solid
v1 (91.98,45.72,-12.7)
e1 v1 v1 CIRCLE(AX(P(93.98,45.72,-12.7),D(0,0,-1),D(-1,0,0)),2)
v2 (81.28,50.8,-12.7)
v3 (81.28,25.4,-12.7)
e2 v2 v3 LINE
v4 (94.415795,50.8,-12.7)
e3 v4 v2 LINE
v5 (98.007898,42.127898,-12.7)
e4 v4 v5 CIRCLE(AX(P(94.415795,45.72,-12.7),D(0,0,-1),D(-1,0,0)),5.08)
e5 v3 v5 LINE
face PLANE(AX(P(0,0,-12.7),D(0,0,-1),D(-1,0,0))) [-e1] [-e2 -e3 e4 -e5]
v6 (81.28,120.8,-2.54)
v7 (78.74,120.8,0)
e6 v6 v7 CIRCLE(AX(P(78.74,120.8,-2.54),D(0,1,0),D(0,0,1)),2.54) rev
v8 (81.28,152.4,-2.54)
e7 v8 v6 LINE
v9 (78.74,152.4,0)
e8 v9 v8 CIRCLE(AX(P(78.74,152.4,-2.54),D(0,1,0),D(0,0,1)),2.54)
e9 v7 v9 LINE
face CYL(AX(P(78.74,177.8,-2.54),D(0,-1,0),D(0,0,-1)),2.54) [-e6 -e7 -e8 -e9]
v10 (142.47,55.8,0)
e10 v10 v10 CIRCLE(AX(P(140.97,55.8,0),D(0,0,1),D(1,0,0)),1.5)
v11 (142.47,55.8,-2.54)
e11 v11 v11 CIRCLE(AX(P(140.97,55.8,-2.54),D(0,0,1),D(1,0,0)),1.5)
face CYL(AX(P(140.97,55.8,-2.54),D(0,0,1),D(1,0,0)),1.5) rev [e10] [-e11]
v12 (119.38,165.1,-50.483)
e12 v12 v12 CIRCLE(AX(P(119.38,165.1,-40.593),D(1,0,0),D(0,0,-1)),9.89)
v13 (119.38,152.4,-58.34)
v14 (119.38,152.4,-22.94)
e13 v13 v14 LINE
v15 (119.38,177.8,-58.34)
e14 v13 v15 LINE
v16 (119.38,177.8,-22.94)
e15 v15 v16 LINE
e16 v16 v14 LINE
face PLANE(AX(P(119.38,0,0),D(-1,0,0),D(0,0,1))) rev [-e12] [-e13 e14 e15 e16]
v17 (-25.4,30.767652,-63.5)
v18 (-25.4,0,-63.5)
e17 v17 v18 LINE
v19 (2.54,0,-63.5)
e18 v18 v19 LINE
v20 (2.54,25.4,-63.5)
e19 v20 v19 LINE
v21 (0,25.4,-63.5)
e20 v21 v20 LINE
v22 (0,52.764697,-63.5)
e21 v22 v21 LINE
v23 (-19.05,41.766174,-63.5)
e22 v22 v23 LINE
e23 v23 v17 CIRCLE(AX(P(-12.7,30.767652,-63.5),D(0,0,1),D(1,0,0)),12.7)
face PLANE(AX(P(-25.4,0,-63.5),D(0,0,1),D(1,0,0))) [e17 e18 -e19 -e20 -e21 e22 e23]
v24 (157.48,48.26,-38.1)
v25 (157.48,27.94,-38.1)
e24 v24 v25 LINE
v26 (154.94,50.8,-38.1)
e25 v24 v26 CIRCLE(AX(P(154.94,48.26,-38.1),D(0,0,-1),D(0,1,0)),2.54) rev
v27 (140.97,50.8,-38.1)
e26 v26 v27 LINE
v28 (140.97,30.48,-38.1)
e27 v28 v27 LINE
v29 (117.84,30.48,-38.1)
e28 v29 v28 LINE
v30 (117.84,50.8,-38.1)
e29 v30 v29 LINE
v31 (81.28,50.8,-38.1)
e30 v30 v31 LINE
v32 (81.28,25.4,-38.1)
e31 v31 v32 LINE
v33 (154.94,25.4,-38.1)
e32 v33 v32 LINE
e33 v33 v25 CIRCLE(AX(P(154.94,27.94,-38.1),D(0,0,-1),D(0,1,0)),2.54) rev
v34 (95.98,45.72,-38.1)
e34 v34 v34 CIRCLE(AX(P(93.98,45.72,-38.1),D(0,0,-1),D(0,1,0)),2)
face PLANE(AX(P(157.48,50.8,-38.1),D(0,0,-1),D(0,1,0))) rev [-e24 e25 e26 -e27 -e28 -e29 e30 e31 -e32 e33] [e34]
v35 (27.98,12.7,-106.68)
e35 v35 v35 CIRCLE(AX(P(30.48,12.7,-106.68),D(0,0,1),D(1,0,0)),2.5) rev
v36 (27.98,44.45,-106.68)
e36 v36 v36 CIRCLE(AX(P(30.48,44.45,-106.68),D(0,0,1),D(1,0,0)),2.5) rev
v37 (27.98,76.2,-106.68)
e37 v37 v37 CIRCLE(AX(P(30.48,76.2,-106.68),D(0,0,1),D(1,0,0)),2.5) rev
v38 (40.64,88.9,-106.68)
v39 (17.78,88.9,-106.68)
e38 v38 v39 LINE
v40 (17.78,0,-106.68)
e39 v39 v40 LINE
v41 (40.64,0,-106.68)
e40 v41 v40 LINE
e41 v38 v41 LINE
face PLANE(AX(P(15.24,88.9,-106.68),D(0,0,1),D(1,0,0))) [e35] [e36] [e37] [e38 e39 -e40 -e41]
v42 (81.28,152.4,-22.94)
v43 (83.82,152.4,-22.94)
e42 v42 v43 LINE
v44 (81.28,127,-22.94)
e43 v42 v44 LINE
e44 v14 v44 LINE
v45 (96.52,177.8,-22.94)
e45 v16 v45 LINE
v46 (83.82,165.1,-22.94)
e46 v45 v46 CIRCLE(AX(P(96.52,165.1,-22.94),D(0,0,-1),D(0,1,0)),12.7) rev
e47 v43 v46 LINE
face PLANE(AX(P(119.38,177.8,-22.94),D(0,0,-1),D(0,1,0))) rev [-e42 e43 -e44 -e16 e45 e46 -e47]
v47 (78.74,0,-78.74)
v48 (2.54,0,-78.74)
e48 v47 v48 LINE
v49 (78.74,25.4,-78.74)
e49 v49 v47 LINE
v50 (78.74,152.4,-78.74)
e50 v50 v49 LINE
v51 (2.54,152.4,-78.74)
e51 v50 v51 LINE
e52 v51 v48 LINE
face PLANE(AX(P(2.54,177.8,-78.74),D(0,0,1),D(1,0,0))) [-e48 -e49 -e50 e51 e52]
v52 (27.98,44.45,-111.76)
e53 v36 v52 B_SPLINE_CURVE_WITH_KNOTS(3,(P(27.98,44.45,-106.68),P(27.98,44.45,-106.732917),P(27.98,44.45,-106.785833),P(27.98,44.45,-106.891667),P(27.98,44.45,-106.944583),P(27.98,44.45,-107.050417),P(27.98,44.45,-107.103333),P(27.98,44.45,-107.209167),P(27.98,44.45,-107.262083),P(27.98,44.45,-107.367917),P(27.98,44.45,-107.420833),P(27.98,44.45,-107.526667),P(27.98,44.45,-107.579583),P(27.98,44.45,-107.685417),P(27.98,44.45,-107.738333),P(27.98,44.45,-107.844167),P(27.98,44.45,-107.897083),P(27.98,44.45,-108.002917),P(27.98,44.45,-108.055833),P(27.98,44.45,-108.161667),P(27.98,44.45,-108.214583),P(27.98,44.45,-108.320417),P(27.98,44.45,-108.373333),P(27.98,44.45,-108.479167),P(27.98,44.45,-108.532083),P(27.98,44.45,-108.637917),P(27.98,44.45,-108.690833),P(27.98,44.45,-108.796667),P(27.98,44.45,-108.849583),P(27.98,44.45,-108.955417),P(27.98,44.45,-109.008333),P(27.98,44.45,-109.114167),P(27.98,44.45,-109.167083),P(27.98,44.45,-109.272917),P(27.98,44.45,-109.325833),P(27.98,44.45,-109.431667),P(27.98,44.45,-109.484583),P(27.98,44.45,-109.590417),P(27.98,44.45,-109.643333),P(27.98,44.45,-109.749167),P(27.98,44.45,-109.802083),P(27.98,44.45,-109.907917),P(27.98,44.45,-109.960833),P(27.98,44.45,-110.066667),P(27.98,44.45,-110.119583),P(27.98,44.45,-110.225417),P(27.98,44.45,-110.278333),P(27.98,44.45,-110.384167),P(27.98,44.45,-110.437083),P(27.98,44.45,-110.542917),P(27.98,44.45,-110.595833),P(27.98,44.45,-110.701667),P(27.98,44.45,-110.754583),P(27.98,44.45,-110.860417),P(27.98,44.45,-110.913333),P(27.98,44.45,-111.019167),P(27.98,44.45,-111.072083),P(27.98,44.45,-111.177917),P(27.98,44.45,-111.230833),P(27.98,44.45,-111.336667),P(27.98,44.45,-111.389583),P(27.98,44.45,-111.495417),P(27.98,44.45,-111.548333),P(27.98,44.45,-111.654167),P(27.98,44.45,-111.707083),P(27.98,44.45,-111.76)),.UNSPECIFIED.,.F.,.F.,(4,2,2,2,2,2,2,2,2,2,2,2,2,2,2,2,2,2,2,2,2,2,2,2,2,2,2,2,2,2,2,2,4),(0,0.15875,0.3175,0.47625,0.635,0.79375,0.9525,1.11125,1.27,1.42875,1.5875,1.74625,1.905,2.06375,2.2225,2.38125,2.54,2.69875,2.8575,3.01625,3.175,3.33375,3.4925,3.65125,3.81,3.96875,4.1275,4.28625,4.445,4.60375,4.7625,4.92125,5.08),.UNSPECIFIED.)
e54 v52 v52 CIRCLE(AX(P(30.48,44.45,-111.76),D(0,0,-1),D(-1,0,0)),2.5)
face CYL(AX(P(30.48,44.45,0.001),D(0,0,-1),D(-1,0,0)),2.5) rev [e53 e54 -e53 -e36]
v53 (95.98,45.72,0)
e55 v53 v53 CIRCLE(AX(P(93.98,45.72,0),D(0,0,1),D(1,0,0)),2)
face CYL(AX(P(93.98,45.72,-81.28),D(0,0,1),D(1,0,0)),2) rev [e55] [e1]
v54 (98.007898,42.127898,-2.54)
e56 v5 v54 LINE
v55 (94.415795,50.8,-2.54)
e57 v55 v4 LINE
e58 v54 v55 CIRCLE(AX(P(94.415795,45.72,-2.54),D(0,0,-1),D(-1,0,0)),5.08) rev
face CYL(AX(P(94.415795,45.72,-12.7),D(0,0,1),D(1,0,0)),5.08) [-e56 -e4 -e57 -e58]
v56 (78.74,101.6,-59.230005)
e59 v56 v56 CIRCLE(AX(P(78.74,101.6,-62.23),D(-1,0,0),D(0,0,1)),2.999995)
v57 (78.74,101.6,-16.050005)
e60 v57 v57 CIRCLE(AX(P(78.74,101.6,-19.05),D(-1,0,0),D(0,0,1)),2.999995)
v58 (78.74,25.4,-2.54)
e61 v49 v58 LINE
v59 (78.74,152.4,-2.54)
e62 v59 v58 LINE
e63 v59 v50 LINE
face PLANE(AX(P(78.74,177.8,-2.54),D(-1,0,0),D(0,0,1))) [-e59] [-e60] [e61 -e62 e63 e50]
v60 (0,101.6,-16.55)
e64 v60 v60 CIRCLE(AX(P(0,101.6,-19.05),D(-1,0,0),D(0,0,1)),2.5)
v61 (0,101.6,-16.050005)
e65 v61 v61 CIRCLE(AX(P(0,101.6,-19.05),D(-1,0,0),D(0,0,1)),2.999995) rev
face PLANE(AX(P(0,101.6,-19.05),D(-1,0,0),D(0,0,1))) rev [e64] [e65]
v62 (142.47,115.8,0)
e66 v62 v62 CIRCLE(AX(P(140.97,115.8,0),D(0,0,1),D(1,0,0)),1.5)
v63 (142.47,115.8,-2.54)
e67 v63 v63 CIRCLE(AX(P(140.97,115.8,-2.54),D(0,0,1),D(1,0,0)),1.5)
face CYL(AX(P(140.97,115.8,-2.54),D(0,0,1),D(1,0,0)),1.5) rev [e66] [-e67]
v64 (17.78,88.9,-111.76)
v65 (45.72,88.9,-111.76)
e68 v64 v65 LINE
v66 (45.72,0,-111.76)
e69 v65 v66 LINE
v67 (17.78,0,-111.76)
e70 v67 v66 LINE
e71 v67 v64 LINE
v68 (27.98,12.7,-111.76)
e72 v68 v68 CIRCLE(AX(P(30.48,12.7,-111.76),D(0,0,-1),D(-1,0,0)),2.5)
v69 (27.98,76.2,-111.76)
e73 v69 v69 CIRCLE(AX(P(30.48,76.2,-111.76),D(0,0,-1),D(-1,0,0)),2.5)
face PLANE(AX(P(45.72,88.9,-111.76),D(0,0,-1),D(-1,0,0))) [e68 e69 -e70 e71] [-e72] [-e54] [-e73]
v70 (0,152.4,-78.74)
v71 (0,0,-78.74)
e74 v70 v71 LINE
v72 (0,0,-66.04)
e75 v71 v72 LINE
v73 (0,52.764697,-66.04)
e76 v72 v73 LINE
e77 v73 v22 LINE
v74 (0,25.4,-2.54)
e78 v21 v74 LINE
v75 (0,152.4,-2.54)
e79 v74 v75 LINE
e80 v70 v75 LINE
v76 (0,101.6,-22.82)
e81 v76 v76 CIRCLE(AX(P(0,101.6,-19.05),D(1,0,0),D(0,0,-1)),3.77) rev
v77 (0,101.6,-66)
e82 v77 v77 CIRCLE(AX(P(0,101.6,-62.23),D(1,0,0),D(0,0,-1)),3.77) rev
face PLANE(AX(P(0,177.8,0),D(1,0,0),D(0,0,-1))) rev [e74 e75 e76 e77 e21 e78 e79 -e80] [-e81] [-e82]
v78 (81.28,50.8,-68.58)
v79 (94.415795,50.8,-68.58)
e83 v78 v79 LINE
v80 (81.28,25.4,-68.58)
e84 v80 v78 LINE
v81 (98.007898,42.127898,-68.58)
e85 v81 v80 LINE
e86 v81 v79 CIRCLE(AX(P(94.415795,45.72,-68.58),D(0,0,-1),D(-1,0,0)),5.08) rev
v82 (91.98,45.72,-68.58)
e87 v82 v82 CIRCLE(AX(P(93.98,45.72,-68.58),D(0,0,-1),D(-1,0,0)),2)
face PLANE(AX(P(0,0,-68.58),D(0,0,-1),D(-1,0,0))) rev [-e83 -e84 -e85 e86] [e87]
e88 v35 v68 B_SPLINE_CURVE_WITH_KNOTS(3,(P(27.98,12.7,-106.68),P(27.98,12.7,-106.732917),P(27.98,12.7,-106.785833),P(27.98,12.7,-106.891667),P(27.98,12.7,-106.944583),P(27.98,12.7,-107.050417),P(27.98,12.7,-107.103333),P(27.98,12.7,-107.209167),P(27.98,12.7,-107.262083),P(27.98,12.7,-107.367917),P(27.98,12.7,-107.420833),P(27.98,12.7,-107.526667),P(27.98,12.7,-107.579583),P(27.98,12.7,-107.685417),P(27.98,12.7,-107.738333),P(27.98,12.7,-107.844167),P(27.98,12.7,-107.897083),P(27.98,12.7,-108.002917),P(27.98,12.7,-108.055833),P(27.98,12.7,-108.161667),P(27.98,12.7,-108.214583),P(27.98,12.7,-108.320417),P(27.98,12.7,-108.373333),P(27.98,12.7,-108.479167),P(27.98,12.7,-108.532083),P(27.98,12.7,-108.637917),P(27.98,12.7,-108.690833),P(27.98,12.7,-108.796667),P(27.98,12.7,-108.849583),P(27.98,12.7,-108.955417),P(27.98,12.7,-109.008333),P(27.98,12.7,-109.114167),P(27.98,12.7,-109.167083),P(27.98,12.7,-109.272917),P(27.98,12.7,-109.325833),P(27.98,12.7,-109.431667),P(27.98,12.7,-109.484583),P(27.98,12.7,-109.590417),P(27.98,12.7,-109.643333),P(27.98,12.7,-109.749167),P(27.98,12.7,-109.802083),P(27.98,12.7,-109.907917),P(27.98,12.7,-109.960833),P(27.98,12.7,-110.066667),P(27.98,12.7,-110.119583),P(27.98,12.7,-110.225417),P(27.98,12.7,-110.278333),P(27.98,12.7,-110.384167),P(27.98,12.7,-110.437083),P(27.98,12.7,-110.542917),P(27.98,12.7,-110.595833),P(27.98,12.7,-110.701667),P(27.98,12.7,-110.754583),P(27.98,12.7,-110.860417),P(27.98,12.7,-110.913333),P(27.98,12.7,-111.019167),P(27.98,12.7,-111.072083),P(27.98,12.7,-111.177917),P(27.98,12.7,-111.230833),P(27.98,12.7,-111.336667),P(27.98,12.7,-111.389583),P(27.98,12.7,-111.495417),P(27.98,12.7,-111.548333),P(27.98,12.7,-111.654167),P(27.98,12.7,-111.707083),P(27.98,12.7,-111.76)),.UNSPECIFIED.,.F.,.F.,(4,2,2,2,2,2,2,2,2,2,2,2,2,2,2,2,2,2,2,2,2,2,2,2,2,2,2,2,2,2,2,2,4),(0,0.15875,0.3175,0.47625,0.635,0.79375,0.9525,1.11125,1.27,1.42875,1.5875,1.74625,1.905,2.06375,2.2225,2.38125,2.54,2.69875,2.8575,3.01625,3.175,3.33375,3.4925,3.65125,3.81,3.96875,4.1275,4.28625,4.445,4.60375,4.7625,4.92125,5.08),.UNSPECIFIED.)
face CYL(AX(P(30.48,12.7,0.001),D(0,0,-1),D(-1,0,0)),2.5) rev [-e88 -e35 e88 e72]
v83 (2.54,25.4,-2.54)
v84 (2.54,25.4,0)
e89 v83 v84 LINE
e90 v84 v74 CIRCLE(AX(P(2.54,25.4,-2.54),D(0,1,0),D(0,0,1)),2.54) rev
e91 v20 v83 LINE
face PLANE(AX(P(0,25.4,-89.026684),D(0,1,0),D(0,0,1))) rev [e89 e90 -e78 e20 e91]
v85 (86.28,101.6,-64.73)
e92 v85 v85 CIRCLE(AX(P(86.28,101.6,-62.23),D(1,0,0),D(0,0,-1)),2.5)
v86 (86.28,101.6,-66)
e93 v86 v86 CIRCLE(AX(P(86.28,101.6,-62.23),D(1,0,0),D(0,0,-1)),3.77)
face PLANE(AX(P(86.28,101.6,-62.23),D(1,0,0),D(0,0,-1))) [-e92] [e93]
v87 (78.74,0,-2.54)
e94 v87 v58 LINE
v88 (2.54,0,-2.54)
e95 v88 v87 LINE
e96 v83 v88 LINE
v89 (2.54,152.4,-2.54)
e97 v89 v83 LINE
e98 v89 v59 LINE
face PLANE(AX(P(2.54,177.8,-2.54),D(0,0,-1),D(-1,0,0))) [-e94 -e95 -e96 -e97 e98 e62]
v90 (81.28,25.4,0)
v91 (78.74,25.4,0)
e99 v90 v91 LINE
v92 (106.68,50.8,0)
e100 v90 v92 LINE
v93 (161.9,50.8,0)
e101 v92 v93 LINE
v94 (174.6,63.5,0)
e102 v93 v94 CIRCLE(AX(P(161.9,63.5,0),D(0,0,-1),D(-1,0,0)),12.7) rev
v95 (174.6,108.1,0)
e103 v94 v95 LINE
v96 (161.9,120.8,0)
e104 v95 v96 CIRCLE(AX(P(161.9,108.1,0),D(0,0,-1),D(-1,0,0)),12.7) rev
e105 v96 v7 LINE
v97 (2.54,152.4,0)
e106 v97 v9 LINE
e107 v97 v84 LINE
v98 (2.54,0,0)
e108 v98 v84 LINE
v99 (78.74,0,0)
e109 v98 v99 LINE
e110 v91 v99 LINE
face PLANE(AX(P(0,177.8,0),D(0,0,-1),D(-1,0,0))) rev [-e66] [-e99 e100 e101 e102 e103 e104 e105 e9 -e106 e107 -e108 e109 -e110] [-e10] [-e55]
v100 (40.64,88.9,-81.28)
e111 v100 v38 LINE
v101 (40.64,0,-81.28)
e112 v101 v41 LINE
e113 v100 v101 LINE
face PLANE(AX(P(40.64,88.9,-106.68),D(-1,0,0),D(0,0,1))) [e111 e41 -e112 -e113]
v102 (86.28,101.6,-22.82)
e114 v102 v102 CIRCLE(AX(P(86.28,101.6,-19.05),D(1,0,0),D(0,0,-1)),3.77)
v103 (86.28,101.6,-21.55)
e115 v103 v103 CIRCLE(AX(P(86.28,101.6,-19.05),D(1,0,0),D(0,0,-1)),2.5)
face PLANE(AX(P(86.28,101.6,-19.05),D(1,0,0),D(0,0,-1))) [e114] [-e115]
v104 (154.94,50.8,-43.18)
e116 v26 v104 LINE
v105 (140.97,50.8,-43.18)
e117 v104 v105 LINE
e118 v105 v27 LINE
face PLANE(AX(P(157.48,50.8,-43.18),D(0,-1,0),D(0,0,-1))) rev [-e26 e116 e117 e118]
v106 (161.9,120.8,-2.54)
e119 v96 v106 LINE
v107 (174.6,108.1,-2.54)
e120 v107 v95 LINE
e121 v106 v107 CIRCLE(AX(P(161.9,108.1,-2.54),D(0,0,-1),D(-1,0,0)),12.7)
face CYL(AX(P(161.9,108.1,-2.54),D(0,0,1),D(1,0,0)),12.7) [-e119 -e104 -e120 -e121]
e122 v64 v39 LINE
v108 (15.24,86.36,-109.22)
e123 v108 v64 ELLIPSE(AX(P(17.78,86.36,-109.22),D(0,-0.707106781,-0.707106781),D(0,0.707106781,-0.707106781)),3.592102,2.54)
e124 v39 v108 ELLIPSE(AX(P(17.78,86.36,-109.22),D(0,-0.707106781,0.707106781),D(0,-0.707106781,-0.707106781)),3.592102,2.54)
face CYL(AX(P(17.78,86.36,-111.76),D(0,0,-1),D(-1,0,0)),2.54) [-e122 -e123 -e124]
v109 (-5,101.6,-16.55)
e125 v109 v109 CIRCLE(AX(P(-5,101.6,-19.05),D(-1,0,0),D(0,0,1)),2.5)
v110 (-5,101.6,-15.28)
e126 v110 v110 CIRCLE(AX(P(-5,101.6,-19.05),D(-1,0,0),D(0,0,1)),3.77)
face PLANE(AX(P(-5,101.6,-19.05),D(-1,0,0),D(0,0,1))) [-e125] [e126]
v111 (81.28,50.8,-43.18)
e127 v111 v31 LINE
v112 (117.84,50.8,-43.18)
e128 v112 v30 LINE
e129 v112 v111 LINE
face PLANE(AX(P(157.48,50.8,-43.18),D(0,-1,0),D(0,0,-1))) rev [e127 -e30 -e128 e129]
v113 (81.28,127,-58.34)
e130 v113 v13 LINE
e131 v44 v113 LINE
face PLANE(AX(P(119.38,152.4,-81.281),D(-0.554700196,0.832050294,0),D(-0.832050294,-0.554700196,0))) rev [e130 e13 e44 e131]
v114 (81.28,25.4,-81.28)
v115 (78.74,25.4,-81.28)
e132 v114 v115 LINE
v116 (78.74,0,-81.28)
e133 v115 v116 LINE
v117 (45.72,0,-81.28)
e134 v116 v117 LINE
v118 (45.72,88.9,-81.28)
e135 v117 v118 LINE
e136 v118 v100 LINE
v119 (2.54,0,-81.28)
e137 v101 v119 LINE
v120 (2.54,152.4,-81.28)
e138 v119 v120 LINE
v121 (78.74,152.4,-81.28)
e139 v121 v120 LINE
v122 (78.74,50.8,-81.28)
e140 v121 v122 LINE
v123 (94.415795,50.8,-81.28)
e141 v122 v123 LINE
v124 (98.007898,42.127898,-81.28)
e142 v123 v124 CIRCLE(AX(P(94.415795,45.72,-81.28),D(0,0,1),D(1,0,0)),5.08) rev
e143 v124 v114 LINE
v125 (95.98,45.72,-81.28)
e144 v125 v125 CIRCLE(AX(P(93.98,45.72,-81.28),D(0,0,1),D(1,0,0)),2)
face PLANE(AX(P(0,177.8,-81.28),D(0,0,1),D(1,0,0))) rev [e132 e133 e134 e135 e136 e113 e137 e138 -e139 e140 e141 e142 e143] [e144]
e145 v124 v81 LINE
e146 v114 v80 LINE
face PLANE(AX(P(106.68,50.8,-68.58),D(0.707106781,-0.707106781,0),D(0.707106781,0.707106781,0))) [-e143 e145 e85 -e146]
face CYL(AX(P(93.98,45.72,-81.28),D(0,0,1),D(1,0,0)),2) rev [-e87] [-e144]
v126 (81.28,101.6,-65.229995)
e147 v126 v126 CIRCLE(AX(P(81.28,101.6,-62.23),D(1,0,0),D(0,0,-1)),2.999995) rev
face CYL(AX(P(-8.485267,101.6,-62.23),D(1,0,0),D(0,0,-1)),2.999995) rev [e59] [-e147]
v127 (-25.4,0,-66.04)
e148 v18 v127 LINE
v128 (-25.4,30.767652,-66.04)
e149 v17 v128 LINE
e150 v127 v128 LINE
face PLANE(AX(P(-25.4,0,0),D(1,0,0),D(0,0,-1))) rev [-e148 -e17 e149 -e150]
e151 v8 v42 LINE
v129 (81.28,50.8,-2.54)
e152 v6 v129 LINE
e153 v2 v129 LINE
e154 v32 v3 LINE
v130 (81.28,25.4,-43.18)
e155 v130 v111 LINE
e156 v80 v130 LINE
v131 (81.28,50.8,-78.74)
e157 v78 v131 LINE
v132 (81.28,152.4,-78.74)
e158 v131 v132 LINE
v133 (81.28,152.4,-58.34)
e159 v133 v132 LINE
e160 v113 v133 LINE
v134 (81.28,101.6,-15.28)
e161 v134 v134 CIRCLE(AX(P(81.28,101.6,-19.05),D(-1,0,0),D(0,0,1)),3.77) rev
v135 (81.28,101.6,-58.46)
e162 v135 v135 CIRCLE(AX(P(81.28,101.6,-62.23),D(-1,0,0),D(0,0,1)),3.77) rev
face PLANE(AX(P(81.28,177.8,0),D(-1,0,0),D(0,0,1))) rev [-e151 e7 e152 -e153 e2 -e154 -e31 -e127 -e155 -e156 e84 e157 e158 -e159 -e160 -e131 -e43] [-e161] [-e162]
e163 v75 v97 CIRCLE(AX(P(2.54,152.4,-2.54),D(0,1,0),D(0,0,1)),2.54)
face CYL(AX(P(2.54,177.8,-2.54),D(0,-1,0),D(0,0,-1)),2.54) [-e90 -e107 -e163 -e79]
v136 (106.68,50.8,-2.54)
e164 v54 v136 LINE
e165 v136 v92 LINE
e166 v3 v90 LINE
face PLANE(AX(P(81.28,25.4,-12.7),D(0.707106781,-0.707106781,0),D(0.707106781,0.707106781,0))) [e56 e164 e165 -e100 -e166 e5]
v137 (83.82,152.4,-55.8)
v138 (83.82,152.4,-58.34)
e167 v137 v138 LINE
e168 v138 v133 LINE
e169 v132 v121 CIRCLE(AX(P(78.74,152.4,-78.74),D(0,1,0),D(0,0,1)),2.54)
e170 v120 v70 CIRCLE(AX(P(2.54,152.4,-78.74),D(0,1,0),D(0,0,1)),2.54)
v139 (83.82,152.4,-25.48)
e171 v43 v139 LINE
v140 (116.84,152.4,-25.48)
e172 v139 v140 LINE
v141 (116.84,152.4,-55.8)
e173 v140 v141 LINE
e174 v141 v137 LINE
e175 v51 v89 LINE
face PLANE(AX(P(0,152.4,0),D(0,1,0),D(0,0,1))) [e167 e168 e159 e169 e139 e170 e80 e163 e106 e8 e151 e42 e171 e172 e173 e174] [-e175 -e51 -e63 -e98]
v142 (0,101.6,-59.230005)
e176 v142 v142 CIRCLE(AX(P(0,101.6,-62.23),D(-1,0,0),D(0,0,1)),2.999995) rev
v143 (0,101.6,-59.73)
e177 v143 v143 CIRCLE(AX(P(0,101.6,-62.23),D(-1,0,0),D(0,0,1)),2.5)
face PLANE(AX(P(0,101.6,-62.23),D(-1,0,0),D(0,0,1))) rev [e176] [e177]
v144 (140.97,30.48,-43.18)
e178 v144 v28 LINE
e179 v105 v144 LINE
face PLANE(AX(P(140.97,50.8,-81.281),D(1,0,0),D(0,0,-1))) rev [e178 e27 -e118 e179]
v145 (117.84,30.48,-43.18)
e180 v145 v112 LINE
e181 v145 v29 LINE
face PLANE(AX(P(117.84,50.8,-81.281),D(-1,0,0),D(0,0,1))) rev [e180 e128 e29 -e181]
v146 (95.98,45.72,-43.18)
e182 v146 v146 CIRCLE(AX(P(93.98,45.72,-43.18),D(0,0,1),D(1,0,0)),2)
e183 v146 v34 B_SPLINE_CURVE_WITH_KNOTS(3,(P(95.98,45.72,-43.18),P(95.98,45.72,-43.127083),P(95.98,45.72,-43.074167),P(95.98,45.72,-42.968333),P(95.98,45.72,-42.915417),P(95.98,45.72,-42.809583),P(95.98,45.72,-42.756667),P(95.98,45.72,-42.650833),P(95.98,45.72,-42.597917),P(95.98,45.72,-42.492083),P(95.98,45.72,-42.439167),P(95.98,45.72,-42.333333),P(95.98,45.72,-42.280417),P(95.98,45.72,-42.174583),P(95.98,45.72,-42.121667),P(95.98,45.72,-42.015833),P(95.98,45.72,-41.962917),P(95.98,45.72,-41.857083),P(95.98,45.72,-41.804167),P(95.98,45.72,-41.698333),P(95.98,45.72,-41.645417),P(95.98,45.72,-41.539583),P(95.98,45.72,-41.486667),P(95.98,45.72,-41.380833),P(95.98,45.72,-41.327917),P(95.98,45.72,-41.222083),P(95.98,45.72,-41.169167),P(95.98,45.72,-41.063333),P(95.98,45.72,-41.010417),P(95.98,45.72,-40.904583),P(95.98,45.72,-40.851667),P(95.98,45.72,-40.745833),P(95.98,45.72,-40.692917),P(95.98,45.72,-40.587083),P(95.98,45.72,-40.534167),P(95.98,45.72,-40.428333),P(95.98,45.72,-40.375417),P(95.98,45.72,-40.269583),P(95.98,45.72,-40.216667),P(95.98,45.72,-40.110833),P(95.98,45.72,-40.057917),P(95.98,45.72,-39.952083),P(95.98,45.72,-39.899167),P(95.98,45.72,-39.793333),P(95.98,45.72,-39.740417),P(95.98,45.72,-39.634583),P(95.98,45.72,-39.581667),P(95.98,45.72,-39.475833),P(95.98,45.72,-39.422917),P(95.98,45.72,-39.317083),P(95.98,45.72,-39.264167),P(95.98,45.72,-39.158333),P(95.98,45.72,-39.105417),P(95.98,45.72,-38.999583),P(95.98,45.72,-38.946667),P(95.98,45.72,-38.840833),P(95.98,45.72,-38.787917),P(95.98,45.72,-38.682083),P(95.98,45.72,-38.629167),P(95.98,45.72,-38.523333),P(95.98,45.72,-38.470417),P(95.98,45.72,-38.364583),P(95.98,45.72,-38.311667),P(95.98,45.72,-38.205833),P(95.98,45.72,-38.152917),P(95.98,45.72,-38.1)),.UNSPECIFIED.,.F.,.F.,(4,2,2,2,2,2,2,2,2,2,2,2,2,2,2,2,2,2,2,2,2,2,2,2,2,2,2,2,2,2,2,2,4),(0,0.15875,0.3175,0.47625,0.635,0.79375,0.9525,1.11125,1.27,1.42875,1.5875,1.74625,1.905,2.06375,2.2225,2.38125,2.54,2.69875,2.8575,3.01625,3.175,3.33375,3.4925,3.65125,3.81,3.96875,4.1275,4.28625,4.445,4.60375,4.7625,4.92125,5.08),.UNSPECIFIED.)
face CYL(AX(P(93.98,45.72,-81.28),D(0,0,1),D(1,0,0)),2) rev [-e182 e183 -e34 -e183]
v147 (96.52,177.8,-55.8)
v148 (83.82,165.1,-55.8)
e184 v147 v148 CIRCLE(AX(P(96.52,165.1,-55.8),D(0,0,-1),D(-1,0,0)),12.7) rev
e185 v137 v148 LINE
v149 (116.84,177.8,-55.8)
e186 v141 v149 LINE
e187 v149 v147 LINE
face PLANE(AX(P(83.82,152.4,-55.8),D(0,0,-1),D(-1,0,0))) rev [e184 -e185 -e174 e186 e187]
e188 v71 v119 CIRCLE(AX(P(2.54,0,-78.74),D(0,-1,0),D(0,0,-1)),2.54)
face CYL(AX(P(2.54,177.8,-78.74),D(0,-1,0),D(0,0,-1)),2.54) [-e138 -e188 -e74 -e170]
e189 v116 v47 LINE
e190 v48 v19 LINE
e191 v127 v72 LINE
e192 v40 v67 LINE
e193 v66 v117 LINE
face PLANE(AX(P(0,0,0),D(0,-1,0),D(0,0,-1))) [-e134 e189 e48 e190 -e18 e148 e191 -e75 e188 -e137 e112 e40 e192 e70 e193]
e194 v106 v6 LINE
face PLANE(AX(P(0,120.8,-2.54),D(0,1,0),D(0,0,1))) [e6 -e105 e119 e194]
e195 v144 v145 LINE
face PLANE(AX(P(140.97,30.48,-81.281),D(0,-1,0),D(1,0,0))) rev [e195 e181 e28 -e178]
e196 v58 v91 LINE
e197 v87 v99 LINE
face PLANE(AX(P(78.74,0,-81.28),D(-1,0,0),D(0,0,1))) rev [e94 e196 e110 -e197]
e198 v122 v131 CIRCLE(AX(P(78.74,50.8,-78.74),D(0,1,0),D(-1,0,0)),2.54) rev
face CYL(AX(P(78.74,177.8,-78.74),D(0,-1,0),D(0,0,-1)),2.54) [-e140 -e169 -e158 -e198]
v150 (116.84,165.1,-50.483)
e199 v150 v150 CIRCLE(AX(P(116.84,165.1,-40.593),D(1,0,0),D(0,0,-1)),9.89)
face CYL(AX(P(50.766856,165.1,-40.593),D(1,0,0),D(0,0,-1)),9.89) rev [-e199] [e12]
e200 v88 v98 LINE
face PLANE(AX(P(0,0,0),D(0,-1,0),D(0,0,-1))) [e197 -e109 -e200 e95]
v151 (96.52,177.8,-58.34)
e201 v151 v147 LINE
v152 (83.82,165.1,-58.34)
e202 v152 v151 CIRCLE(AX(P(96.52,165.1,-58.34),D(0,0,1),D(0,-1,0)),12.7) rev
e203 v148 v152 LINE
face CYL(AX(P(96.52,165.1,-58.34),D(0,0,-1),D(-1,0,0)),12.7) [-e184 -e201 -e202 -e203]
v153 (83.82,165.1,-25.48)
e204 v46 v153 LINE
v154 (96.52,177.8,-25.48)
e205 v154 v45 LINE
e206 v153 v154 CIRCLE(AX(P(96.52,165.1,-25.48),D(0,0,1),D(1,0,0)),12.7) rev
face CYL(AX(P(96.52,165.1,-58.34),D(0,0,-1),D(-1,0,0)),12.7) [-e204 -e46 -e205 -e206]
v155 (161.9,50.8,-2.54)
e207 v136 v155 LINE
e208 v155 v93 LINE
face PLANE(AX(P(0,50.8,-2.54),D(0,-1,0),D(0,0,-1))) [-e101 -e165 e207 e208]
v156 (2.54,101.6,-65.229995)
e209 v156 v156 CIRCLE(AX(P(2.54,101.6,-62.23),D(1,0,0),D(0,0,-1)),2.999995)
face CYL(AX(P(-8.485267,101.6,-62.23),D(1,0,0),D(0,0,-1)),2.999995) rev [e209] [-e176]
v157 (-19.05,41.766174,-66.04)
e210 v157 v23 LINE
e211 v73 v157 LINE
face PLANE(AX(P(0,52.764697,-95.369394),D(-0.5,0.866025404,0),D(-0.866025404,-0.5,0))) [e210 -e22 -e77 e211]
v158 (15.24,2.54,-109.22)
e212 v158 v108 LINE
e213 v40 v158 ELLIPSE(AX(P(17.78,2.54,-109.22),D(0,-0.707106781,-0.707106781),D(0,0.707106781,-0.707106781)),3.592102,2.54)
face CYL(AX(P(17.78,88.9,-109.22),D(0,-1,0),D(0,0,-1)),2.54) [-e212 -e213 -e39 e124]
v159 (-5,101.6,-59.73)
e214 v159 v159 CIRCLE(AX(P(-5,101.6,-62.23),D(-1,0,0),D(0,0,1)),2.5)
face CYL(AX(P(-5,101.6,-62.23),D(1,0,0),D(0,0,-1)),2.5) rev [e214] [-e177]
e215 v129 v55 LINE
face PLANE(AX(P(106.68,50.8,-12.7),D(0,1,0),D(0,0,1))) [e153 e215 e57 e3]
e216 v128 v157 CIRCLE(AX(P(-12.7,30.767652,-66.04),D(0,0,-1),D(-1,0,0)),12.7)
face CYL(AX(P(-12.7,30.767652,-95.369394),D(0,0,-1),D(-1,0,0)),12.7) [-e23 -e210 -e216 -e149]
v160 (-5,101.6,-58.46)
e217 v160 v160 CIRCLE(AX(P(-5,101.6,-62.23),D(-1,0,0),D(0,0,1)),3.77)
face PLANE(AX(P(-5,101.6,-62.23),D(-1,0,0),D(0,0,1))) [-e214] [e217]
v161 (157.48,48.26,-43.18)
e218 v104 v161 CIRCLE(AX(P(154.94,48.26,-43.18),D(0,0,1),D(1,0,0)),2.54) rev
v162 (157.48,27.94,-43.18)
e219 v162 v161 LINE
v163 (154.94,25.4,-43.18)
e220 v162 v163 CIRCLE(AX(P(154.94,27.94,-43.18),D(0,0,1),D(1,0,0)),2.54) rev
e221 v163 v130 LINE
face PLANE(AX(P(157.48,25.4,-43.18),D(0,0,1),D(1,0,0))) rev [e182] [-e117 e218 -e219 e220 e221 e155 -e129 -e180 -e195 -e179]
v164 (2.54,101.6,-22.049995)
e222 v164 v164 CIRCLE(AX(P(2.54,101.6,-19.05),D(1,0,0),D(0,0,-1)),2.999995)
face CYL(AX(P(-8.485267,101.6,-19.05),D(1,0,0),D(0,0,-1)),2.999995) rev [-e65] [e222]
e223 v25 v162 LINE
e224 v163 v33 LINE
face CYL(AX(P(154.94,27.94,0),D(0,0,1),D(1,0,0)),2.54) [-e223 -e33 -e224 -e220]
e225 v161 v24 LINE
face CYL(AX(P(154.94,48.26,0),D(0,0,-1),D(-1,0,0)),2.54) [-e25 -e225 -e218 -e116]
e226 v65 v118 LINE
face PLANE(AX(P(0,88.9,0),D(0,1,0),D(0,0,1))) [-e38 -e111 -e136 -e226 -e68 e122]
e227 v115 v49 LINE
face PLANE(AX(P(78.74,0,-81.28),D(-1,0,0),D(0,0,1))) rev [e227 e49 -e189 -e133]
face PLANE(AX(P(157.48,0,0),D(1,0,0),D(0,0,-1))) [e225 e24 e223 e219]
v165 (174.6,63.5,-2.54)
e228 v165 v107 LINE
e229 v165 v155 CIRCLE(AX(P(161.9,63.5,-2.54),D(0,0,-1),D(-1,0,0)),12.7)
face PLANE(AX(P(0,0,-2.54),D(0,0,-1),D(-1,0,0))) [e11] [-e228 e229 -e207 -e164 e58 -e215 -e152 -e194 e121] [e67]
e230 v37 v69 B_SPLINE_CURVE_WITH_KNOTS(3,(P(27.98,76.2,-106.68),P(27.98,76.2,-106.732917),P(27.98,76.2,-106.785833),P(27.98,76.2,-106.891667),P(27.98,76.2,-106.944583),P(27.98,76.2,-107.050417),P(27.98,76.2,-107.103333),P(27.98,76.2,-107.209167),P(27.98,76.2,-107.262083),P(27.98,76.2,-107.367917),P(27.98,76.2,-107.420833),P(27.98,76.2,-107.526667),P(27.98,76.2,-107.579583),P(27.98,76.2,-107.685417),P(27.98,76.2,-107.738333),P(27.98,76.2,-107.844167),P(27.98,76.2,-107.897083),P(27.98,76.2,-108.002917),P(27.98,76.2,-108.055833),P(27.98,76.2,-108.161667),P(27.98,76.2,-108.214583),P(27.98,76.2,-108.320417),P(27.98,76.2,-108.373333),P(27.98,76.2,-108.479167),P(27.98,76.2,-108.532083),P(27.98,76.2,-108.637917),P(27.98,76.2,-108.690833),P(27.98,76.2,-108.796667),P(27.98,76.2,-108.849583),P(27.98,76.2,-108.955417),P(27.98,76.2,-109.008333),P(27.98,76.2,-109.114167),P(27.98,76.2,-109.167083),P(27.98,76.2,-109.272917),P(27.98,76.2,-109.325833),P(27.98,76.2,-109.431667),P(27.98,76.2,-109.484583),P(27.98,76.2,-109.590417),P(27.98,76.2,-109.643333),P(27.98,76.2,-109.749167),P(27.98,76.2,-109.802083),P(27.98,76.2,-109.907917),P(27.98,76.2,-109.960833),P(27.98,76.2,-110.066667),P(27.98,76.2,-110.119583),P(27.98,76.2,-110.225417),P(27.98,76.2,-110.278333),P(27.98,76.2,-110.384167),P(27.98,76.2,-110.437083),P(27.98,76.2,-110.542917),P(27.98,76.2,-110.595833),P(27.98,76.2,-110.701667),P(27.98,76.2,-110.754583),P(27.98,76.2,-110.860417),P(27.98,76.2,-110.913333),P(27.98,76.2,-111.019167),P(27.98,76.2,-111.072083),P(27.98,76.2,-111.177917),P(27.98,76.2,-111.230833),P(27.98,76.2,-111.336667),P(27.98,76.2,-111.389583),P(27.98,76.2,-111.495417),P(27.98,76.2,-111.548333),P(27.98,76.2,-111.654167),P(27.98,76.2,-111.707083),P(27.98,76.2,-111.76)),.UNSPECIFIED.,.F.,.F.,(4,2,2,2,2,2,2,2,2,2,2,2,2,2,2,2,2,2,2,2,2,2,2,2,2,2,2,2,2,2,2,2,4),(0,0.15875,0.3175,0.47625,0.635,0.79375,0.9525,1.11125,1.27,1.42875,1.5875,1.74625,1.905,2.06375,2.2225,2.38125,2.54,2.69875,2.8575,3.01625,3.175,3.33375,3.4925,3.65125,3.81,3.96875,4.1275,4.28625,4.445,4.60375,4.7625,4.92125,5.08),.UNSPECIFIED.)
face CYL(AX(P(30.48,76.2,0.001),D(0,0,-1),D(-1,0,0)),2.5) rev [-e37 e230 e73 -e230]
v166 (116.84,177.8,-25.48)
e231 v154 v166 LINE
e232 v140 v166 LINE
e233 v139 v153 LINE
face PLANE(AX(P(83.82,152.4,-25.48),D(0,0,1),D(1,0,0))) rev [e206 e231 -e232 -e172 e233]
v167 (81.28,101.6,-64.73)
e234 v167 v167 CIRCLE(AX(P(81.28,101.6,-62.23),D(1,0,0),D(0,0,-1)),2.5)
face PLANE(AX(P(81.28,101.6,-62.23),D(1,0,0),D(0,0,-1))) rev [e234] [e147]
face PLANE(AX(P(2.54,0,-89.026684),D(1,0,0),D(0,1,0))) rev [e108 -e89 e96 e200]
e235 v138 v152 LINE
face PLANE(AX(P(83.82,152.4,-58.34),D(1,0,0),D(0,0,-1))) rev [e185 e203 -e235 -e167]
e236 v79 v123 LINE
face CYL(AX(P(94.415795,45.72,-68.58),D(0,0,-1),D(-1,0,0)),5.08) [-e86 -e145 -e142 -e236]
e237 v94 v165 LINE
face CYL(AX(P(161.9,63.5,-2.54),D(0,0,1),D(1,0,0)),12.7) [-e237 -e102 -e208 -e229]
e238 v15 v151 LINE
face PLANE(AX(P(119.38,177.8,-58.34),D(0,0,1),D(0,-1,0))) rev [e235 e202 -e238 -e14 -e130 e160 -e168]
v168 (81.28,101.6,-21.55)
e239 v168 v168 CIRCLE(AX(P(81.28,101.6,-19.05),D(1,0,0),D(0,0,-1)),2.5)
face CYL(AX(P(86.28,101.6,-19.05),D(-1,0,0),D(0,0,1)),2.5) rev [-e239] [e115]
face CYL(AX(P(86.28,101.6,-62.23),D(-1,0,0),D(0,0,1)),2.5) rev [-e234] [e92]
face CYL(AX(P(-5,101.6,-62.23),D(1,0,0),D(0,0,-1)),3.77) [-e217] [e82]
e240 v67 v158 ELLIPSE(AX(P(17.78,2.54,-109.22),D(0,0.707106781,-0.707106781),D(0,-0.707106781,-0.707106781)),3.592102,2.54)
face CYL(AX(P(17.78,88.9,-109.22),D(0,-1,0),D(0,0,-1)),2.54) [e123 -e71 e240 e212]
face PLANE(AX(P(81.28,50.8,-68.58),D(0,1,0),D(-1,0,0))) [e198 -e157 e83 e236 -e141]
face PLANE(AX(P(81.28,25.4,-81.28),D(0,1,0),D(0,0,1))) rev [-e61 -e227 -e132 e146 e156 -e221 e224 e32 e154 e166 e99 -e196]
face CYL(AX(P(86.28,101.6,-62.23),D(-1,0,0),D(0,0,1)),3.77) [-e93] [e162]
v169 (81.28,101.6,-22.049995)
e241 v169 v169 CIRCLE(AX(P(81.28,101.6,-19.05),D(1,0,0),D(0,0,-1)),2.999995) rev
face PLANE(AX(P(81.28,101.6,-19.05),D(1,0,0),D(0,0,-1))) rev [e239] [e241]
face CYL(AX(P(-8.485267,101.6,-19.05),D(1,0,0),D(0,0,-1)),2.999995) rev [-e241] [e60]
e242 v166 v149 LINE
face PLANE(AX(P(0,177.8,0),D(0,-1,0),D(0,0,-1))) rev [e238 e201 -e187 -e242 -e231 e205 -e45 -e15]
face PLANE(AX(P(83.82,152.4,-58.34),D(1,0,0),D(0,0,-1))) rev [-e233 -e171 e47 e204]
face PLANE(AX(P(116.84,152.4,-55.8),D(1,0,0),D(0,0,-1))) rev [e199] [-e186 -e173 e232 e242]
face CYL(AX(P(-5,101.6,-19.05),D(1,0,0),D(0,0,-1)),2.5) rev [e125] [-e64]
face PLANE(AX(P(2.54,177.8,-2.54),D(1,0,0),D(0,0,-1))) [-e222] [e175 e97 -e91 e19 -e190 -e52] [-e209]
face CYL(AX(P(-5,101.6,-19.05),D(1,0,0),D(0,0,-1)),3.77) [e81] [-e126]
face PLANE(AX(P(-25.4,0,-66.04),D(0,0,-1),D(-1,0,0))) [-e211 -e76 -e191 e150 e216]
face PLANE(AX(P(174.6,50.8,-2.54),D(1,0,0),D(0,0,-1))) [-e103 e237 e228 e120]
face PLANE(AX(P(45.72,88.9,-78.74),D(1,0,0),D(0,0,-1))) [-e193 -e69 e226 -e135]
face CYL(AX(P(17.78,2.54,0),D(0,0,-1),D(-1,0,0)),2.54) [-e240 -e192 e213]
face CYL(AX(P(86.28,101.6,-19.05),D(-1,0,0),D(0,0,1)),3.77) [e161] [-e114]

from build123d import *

# Parameters (mm, degrees)
SKETCH1_W            = 81.28
SKETCH1_H            = 81.28
SKETCH1_W_2          = 76.2
SKETCH1_H_2          = 76.2
BOSS_EXTRUDE1_DEPTH  = 177.8
SKETCH2_W            = 2.54
SKETCH2_H            = 38.1
BOSS_EXTRUDE2_DEPTH  = 25.4
SKETCH3_W            = 2.54
SKETCH3_H            = 25.4
CUT_EXTRUDE1_DEPTH   = 212.720846399
BOSS_EXTRUDE3_DEPTH  = 12.7
BOSS_EXTRUDE4_DEPTH  = 12.7
SKETCH14_W           = 5.08
SKETCH14_H           = 25.4
BOSS_EXTRUDE6_DEPTH  = 76.2
CUT_EXTRUDE2_REACH   = 243.407
SKETCH16_W           = 23.13
SKETCH16_H           = 20.32
SKETCH22_R           = 2
CUT_EXTRUDE6_DEPTH   = 252.036309724
SKETCH28_W           = 35.399999812
SKETCH28_H           = 50.8
BOSS_EXTRUDE7_DEPTH  = 38.1
CUT_EXTRUDE8_REACH   = 246.574
SKETCH32_W           = 33.02
SKETCH32_H           = 30.319999812
CUT_EXTRUDE9_DEPTH   = 25.4
CUT_EXTRUDE13_REACH  = 245.27
SKETCH34_R           = 9.890000016
BOSS_EXTRUDE9_DEPTH  = 2.54
SKETCH38_W           = 2.54
SKETCH38_H           = 25.4
CUT_EXTRUDE15_DEPTH  = 63.5
CUT_EXTRUDE17_REACH  = 224.71
SKETCH40_R           = 2.999995
SKETCH41_R           = 3.77
SKETCH41_R_2         = 2.5
BOSS_EXTRUDE10_DEPTH = 5
BOSS_EXTRUDE11_START = 5
SKETCH42_R           = 3.77
SKETCH42_R_2         = 2.5
BOSS_EXTRUDE11_DEPTH = 5
SKETCH43_W           = 76.2
SKETCH43_H           = 76.2
CUT_EXTRUDE20_DEPTH  = 25.4
SKETCH44_W           = 174.6
SKETCH44_H           = 70
SKETCH44_R           = 1.5
BOSS_EXTRUDE12_DEPTH = 2.54
FILLET1_R            = 5.08
FILLET2_R            = 12.7
FILLET3_R            = 2.54
FILLET7_R            = 12.7
FILLET9_R            = 12.7
BOSS_EXTRUDE20_DEPTH = 88.9
CUT_EXTRUDE21_REACH  = 275.109
SKETCH54_R           = 2.5
FILLET11_R           = 2.54
FILLET12_R           = 2.54


with BuildPart() as part:
    # Sketch1 → Boss-Extrude1 (new body)
    with BuildSketch(Plane(origin=(0, 0, 0), x_dir=(1, 0, 0), z_dir=(0, 1, 0))):
        with Locations((40.64, 40.64)):
            Rectangle(SKETCH1_W, SKETCH1_H)
        with Locations((40.64, 40.64)):
            Rectangle(SKETCH1_W_2, SKETCH1_H_2, mode=Mode.SUBTRACT)
    extrude(amount=BOSS_EXTRUDE1_DEPTH)

    # Sketch2 → Boss-Extrude2 (add)
    with BuildSketch(Plane(origin=(0, 0, 0), x_dir=(0, 0, -1), z_dir=(1, 0, 0))):
        with Locations((64.77, 19.05)):
            Rectangle(SKETCH2_W, SKETCH2_H)
    extrude(amount=-BOSS_EXTRUDE2_DEPTH)

    # Sketch3 → Cut-Extrude1 (cut, through all)
    with BuildSketch(Plane.XY):
        with Locations((80.01, 12.7)):
            Rectangle(SKETCH3_W, SKETCH3_H)
    extrude(amount=-CUT_EXTRUDE1_DEPTH, mode=Mode.SUBTRACT)

    # Sketch7 → Boss-Extrude3 (add)
    with BuildSketch(Plane.XY):
        Polygon((81.28, 25.4), (106.68, 50.8), (81.28, 50.8), align=None)
    extrude(amount=-BOSS_EXTRUDE3_DEPTH)

    # Sketch10 → Boss-Extrude4 (add)
    with BuildSketch(Plane(origin=(0, 0, -81.28), x_dir=(-1, 0, 0), z_dir=(0, 0, -1))):
        Polygon((-81.28, 25.4), (-81.28, 50.8), (-106.68, 50.8), align=None)
    extrude(amount=-BOSS_EXTRUDE4_DEPTH)

    # Sketch14 → Boss-Extrude6 (add)
    with BuildSketch(Plane(origin=(81.28, 0, 0), x_dir=(0, 0, -1), z_dir=(1, 0, 0))):
        with Locations((40.64, 38.1)):
            Rectangle(SKETCH14_W, SKETCH14_H)
    extrude(amount=BOSS_EXTRUDE6_DEPTH)

    # Sketch16 → Cut-Extrude2 (cut, up to next)
    with BuildSketch(Plane.XY.offset(-38.1), mode=Mode.PRIVATE) as cut_extrude2_sk1:
        with Locations((129.405, 40.64)):
            Rectangle(SKETCH16_W, SKETCH16_H)
    cut_extrude2_tool1 = extrude(cut_extrude2_sk1.sketch, amount=-CUT_EXTRUDE2_REACH, mode=Mode.PRIVATE) & part.part
    add(cut_extrude2_tool1.solids().sort_by_distance((129.405, 40.64, -38.1))[0], mode=Mode.SUBTRACT)

    # Sketch22 → Cut-Extrude6 (cut, through all)
    with BuildSketch(Plane.XY):
        with Locations((93.98, 45.72)):
            Circle(SKETCH22_R)
    extrude(amount=-CUT_EXTRUDE6_DEPTH, mode=Mode.SUBTRACT)

    # Sketch28 → Boss-Extrude7 (add)
    with BuildSketch(Plane(origin=(81.28, 0, 0), x_dir=(0, 0, -1), z_dir=(1, 0, 0))):
        with Locations((40.64, 152.4)):
            Rectangle(SKETCH28_W, SKETCH28_H)
    extrude(amount=BOSS_EXTRUDE7_DEPTH)

    # Sketch30 → Cut-Extrude8 (cut, up to next)
    with BuildSketch(Plane.XY.offset(-22.940000094), mode=Mode.PRIVATE) as cut_extrude8_sk1:
        Polygon((81.28, 127), (119.38, 127), (119.38, 152.4), align=None)
    cut_extrude8_tool1 = extrude(cut_extrude8_sk1.sketch, amount=-CUT_EXTRUDE8_REACH, mode=Mode.PRIVATE) & part.part
    add(cut_extrude8_tool1.solids().sort_by_distance((106.68, 135.466667, -22.94))[0], mode=Mode.SUBTRACT)

    # Sketch32 → Cut-Extrude9 (cut)
    with BuildSketch(Plane(origin=(0, 177.8, 0), x_dir=(1, 0, 0), z_dir=(0, 1, 0))):
        with Locations((100.33, 40.64)):
            Rectangle(SKETCH32_W, SKETCH32_H)
    extrude(amount=-CUT_EXTRUDE9_DEPTH, mode=Mode.SUBTRACT)

    # Cut-Extrude13: up to this face of the body (flat: up to its plane)
    cut_extrude13_end = Plane(part.part.faces().sort_by_distance((78.74, 101.6, -40.64))[0])
    # Sketch34 → Cut-Extrude13 (cut, up to the picked face)
    with BuildSketch(Plane(origin=(119.38, 0, 0), x_dir=(0, 0, -1), z_dir=(1, 0, 0)), mode=Mode.PRIVATE) as cut_extrude13_sk1:
        with Locations(Location((40.593000094, 165.1, 0), (0, 0, 180))):
            Circle(SKETCH34_R)
    cut_extrude13_tool1 = split(extrude(cut_extrude13_sk1.sketch, amount=-CUT_EXTRUDE13_REACH, mode=Mode.PRIVATE), bisect_by=cut_extrude13_end, keep=Keep.BOTH, mode=Mode.PRIVATE)
    add(cut_extrude13_tool1.solids().sort_by(Axis((119.38, 165.1, -40.593), (-1, 0, 0)))[0], mode=Mode.SUBTRACT)

    # Sketch37 → Boss-Extrude9 (add)
    with BuildSketch(Plane.XY.offset(-63.5)):
        Polygon((-25.4, 38.1), (0, 38.1), (0, 52.764696837), align=None)
    extrude(amount=-BOSS_EXTRUDE9_DEPTH)

    # Sketch38 → Cut-Extrude15 (cut)
    with BuildSketch(Plane.XY):
        with Locations((1.27, 12.7)):
            Rectangle(SKETCH38_W, SKETCH38_H)
    extrude(amount=-CUT_EXTRUDE15_DEPTH, mode=Mode.SUBTRACT)

    # Cut-Extrude17: up to this face of the body (flat: up to its plane)
    cut_extrude17_end = Plane(part.part.faces().sort_by_distance((0, 99.23335202, -41.514066738))[0])
    # Sketch40 → Cut-Extrude17 (cut, up to the picked face)
    with BuildSketch(Plane(origin=(81.28, 0, 0), x_dir=(0, 0, -1), z_dir=(1, 0, 0)), mode=Mode.PRIVATE) as cut_extrude17_sk1:
        with Locations((19.05, 101.6)):
            Circle(SKETCH40_R)
    cut_extrude17_tool1 = split(extrude(cut_extrude17_sk1.sketch, amount=-CUT_EXTRUDE17_REACH, mode=Mode.PRIVATE), bisect_by=cut_extrude17_end, keep=Keep.BOTH, mode=Mode.PRIVATE)
    # Sketch40 → Cut-Extrude17 (cut, up to the picked face)
    with BuildSketch(Plane(origin=(81.28, 0, 0), x_dir=(0, 0, -1), z_dir=(1, 0, 0)), mode=Mode.PRIVATE) as cut_extrude17_sk2:
        with Locations((62.23, 101.6)):
            Circle(SKETCH40_R)
    cut_extrude17_tool2 = split(extrude(cut_extrude17_sk2.sketch, amount=-CUT_EXTRUDE17_REACH, mode=Mode.PRIVATE), bisect_by=cut_extrude17_end, keep=Keep.BOTH, mode=Mode.PRIVATE)
    add(cut_extrude17_tool1.solids().sort_by(Axis((81.28, 101.6, -19.05), (-1, 0, 0)))[0], mode=Mode.SUBTRACT)
    add(cut_extrude17_tool2.solids().sort_by(Axis((81.28, 101.6, -62.23), (-1, 0, 0)))[0], mode=Mode.SUBTRACT)

    # Sketch41 → Boss-Extrude10 (add)
    # profile 1 of 2: a face of its own
    with BuildSketch(Plane(origin=(81.28, 0, 0), x_dir=(0, 0, -1), z_dir=(1, 0, 0))):
        with Locations(Location((19.05, 101.6, 0), (0, 0, 180))):
            Circle(SKETCH41_R)
        with Locations((19.05, 101.6)):
            Circle(SKETCH41_R_2, mode=Mode.SUBTRACT)
    # profile 2 of 2: a face of its own
    with BuildSketch(Plane(origin=(81.28, 0, 0), x_dir=(0, 0, -1), z_dir=(1, 0, 0))):
        with Locations(Location((62.23, 101.6, 0), (0, 0, 180))):
            Circle(SKETCH41_R)
        with Locations((62.23, 101.6)):
            Circle(SKETCH41_R_2, mode=Mode.SUBTRACT)
    extrude(amount=BOSS_EXTRUDE10_DEPTH)

    # Sketch42 → Boss-Extrude11 (add)
    # profile 1 of 2: a face of its own
    with BuildSketch(Plane.ZY.offset(BOSS_EXTRUDE11_START)):
        with Locations((-62.23, 101.6)):
            Circle(SKETCH42_R)
        with Locations(Location((-62.23, 101.6, 0), (0, 0, 180))):
            Circle(SKETCH42_R_2, mode=Mode.SUBTRACT)
    # profile 2 of 2: a face of its own
    with BuildSketch(Plane.ZY.offset(BOSS_EXTRUDE11_START)):
        with Locations((-19.05, 101.6)):
            Circle(SKETCH42_R)
        with Locations(Location((-19.05, 101.6, 0), (0, 0, 180))):
            Circle(SKETCH42_R_2, mode=Mode.SUBTRACT)
    extrude(amount=-BOSS_EXTRUDE11_DEPTH)

    # Sketch43 → Cut-Extrude20 (cut)
    with BuildSketch(Plane(origin=(0, 177.8, 0), x_dir=(1, 0, 0), z_dir=(0, 1, 0))):
        Polygon((83.82, 58.339999906), (83.82, 22.940000094), (81.28, 22.940000094), (81.28, 0), (0, 0), (0, 81.28), (81.28, 81.28), (81.28, 58.339999906), align=None)
        with Locations((40.64, 40.64)):
            Rectangle(SKETCH43_W, SKETCH43_H, mode=Mode.SUBTRACT)
    extrude(amount=-CUT_EXTRUDE20_DEPTH, mode=Mode.SUBTRACT)

    # Sketch44 → Boss-Extrude12 (add)
    with BuildSketch(Plane.XY):
        with Locations((87.3, 85.8)):
            Rectangle(SKETCH44_W, SKETCH44_H)
        with Locations((140.97, 115.8)):
            Circle(SKETCH44_R, mode=Mode.SUBTRACT)
        with Locations((140.97, 55.8)):
            Circle(SKETCH44_R, mode=Mode.SUBTRACT)
    extrude(amount=-BOSS_EXTRUDE12_DEPTH)

    # Fillet1
    fillet1_edges = [part.edges().sort_by_distance(p)[0] for p in [
        (106.68, 50.8, -7.62),
        (106.68, 50.8, -74.93),
    ]]
    fillet(fillet1_edges, radius=FILLET1_R)

    # Fillet2
    fillet2_edges = [part.edges().sort_by_distance(p)[0] for p in [
        (174.6, 120.8, -1.27),
        (174.6, 50.8, -1.27),
    ]]
    fillet(fillet2_edges, radius=FILLET2_R)

    # Fillet3
    fillet3_edges = [part.edges().sort_by_distance(p)[0] for p in [
        (157.48, 50.8, -40.64),
        (157.48, 25.4, -40.64),
    ]]
    fillet(fillet3_edges, radius=FILLET3_R)

    # Fillet7
    fillet7_edges = [part.edges().sort_by_distance(p)[0] for p in [
        (-25.4, 38.1, -64.77),
    ]]
    fillet(fillet7_edges, radius=FILLET7_R)

    # Fillet9
    fillet9_edges = [part.edges().sort_by_distance(p)[0] for p in [
        (83.82, 177.8, -24.210000094),
        (83.82, 177.8, -57.069999906),
    ]]
    fillet(fillet9_edges, radius=FILLET9_R)

    # Sketch53 → Boss-Extrude20 (add)
    with BuildSketch(Plane(origin=(0, 0, 0), x_dir=(-1, 0, 0), z_dir=(0, -1, 0))):
        Polygon((-35.659105782, 81.28), (-35.659105782, 78.74), (-45.72, 78.74), (-45.72, 111.76), (-15.24, 111.76), (-15.24, 106.68), (-40.64, 106.68), (-40.64, 81.28), align=None)
    extrude(amount=-BOSS_EXTRUDE20_DEPTH)

    # Sketch54 → Cut-Extrude21 (cut, up to next)
    with BuildSketch(Plane(origin=(0, 0, -111.76), x_dir=(-1, 0, 0), z_dir=(0, 0, -1)), mode=Mode.PRIVATE) as cut_extrude21_sk1:
        with Locations((-30.48, 76.2)):
            Circle(SKETCH54_R)
    cut_extrude21_tool1 = extrude(cut_extrude21_sk1.sketch, amount=-CUT_EXTRUDE21_REACH, mode=Mode.PRIVATE) & part.part
    # Sketch54 → Cut-Extrude21 (cut, up to next)
    with BuildSketch(Plane(origin=(0, 0, -111.76), x_dir=(-1, 0, 0), z_dir=(0, 0, -1)), mode=Mode.PRIVATE) as cut_extrude21_sk2:
        with Locations((-30.48, 44.45)):
            Circle(SKETCH54_R)
    cut_extrude21_tool2 = extrude(cut_extrude21_sk2.sketch, amount=-CUT_EXTRUDE21_REACH, mode=Mode.PRIVATE) & part.part
    # Sketch54 → Cut-Extrude21 (cut, up to next)
    with BuildSketch(Plane(origin=(0, 0, -111.76), x_dir=(-1, 0, 0), z_dir=(0, 0, -1)), mode=Mode.PRIVATE) as cut_extrude21_sk3:
        with Locations((-30.48, 12.7)):
            Circle(SKETCH54_R)
    cut_extrude21_tool3 = extrude(cut_extrude21_sk3.sketch, amount=-CUT_EXTRUDE21_REACH, mode=Mode.PRIVATE) & part.part
    add(cut_extrude21_tool1.solids().sort_by_distance((30.48, 76.2, -111.76))[0], mode=Mode.SUBTRACT)
    add(cut_extrude21_tool2.solids().sort_by_distance((30.48, 44.45, -111.76))[0], mode=Mode.SUBTRACT)
    add(cut_extrude21_tool3.solids().sort_by_distance((30.48, 12.7, -111.76))[0], mode=Mode.SUBTRACT)

    # Fillet11
    fillet11_edges = [part.edges().sort_by_distance(p)[0] for p in [
        (15.24, 0, -109.22),
        (15.24, 88.9, -109.22),
        (15.24, 44.45, -111.76),
        (15.24, 44.45, -106.68),
    ]]
    fillet(fillet11_edges, radius=FILLET11_R - 0.0001)  # a hair under: the kernel refuses the full size

    # Fillet12
    fillet12_edges = [part.edges().sort_by_distance(p)[0] for p in [
        (81.28, 136.6, 0),
        (81.28, 101.6, -81.28),
        (0, 76.2, -81.28),
        (0, 88.9, 0),
    ]]
    fillet(fillet12_edges, radius=FILLET12_R)


solid = part.part
